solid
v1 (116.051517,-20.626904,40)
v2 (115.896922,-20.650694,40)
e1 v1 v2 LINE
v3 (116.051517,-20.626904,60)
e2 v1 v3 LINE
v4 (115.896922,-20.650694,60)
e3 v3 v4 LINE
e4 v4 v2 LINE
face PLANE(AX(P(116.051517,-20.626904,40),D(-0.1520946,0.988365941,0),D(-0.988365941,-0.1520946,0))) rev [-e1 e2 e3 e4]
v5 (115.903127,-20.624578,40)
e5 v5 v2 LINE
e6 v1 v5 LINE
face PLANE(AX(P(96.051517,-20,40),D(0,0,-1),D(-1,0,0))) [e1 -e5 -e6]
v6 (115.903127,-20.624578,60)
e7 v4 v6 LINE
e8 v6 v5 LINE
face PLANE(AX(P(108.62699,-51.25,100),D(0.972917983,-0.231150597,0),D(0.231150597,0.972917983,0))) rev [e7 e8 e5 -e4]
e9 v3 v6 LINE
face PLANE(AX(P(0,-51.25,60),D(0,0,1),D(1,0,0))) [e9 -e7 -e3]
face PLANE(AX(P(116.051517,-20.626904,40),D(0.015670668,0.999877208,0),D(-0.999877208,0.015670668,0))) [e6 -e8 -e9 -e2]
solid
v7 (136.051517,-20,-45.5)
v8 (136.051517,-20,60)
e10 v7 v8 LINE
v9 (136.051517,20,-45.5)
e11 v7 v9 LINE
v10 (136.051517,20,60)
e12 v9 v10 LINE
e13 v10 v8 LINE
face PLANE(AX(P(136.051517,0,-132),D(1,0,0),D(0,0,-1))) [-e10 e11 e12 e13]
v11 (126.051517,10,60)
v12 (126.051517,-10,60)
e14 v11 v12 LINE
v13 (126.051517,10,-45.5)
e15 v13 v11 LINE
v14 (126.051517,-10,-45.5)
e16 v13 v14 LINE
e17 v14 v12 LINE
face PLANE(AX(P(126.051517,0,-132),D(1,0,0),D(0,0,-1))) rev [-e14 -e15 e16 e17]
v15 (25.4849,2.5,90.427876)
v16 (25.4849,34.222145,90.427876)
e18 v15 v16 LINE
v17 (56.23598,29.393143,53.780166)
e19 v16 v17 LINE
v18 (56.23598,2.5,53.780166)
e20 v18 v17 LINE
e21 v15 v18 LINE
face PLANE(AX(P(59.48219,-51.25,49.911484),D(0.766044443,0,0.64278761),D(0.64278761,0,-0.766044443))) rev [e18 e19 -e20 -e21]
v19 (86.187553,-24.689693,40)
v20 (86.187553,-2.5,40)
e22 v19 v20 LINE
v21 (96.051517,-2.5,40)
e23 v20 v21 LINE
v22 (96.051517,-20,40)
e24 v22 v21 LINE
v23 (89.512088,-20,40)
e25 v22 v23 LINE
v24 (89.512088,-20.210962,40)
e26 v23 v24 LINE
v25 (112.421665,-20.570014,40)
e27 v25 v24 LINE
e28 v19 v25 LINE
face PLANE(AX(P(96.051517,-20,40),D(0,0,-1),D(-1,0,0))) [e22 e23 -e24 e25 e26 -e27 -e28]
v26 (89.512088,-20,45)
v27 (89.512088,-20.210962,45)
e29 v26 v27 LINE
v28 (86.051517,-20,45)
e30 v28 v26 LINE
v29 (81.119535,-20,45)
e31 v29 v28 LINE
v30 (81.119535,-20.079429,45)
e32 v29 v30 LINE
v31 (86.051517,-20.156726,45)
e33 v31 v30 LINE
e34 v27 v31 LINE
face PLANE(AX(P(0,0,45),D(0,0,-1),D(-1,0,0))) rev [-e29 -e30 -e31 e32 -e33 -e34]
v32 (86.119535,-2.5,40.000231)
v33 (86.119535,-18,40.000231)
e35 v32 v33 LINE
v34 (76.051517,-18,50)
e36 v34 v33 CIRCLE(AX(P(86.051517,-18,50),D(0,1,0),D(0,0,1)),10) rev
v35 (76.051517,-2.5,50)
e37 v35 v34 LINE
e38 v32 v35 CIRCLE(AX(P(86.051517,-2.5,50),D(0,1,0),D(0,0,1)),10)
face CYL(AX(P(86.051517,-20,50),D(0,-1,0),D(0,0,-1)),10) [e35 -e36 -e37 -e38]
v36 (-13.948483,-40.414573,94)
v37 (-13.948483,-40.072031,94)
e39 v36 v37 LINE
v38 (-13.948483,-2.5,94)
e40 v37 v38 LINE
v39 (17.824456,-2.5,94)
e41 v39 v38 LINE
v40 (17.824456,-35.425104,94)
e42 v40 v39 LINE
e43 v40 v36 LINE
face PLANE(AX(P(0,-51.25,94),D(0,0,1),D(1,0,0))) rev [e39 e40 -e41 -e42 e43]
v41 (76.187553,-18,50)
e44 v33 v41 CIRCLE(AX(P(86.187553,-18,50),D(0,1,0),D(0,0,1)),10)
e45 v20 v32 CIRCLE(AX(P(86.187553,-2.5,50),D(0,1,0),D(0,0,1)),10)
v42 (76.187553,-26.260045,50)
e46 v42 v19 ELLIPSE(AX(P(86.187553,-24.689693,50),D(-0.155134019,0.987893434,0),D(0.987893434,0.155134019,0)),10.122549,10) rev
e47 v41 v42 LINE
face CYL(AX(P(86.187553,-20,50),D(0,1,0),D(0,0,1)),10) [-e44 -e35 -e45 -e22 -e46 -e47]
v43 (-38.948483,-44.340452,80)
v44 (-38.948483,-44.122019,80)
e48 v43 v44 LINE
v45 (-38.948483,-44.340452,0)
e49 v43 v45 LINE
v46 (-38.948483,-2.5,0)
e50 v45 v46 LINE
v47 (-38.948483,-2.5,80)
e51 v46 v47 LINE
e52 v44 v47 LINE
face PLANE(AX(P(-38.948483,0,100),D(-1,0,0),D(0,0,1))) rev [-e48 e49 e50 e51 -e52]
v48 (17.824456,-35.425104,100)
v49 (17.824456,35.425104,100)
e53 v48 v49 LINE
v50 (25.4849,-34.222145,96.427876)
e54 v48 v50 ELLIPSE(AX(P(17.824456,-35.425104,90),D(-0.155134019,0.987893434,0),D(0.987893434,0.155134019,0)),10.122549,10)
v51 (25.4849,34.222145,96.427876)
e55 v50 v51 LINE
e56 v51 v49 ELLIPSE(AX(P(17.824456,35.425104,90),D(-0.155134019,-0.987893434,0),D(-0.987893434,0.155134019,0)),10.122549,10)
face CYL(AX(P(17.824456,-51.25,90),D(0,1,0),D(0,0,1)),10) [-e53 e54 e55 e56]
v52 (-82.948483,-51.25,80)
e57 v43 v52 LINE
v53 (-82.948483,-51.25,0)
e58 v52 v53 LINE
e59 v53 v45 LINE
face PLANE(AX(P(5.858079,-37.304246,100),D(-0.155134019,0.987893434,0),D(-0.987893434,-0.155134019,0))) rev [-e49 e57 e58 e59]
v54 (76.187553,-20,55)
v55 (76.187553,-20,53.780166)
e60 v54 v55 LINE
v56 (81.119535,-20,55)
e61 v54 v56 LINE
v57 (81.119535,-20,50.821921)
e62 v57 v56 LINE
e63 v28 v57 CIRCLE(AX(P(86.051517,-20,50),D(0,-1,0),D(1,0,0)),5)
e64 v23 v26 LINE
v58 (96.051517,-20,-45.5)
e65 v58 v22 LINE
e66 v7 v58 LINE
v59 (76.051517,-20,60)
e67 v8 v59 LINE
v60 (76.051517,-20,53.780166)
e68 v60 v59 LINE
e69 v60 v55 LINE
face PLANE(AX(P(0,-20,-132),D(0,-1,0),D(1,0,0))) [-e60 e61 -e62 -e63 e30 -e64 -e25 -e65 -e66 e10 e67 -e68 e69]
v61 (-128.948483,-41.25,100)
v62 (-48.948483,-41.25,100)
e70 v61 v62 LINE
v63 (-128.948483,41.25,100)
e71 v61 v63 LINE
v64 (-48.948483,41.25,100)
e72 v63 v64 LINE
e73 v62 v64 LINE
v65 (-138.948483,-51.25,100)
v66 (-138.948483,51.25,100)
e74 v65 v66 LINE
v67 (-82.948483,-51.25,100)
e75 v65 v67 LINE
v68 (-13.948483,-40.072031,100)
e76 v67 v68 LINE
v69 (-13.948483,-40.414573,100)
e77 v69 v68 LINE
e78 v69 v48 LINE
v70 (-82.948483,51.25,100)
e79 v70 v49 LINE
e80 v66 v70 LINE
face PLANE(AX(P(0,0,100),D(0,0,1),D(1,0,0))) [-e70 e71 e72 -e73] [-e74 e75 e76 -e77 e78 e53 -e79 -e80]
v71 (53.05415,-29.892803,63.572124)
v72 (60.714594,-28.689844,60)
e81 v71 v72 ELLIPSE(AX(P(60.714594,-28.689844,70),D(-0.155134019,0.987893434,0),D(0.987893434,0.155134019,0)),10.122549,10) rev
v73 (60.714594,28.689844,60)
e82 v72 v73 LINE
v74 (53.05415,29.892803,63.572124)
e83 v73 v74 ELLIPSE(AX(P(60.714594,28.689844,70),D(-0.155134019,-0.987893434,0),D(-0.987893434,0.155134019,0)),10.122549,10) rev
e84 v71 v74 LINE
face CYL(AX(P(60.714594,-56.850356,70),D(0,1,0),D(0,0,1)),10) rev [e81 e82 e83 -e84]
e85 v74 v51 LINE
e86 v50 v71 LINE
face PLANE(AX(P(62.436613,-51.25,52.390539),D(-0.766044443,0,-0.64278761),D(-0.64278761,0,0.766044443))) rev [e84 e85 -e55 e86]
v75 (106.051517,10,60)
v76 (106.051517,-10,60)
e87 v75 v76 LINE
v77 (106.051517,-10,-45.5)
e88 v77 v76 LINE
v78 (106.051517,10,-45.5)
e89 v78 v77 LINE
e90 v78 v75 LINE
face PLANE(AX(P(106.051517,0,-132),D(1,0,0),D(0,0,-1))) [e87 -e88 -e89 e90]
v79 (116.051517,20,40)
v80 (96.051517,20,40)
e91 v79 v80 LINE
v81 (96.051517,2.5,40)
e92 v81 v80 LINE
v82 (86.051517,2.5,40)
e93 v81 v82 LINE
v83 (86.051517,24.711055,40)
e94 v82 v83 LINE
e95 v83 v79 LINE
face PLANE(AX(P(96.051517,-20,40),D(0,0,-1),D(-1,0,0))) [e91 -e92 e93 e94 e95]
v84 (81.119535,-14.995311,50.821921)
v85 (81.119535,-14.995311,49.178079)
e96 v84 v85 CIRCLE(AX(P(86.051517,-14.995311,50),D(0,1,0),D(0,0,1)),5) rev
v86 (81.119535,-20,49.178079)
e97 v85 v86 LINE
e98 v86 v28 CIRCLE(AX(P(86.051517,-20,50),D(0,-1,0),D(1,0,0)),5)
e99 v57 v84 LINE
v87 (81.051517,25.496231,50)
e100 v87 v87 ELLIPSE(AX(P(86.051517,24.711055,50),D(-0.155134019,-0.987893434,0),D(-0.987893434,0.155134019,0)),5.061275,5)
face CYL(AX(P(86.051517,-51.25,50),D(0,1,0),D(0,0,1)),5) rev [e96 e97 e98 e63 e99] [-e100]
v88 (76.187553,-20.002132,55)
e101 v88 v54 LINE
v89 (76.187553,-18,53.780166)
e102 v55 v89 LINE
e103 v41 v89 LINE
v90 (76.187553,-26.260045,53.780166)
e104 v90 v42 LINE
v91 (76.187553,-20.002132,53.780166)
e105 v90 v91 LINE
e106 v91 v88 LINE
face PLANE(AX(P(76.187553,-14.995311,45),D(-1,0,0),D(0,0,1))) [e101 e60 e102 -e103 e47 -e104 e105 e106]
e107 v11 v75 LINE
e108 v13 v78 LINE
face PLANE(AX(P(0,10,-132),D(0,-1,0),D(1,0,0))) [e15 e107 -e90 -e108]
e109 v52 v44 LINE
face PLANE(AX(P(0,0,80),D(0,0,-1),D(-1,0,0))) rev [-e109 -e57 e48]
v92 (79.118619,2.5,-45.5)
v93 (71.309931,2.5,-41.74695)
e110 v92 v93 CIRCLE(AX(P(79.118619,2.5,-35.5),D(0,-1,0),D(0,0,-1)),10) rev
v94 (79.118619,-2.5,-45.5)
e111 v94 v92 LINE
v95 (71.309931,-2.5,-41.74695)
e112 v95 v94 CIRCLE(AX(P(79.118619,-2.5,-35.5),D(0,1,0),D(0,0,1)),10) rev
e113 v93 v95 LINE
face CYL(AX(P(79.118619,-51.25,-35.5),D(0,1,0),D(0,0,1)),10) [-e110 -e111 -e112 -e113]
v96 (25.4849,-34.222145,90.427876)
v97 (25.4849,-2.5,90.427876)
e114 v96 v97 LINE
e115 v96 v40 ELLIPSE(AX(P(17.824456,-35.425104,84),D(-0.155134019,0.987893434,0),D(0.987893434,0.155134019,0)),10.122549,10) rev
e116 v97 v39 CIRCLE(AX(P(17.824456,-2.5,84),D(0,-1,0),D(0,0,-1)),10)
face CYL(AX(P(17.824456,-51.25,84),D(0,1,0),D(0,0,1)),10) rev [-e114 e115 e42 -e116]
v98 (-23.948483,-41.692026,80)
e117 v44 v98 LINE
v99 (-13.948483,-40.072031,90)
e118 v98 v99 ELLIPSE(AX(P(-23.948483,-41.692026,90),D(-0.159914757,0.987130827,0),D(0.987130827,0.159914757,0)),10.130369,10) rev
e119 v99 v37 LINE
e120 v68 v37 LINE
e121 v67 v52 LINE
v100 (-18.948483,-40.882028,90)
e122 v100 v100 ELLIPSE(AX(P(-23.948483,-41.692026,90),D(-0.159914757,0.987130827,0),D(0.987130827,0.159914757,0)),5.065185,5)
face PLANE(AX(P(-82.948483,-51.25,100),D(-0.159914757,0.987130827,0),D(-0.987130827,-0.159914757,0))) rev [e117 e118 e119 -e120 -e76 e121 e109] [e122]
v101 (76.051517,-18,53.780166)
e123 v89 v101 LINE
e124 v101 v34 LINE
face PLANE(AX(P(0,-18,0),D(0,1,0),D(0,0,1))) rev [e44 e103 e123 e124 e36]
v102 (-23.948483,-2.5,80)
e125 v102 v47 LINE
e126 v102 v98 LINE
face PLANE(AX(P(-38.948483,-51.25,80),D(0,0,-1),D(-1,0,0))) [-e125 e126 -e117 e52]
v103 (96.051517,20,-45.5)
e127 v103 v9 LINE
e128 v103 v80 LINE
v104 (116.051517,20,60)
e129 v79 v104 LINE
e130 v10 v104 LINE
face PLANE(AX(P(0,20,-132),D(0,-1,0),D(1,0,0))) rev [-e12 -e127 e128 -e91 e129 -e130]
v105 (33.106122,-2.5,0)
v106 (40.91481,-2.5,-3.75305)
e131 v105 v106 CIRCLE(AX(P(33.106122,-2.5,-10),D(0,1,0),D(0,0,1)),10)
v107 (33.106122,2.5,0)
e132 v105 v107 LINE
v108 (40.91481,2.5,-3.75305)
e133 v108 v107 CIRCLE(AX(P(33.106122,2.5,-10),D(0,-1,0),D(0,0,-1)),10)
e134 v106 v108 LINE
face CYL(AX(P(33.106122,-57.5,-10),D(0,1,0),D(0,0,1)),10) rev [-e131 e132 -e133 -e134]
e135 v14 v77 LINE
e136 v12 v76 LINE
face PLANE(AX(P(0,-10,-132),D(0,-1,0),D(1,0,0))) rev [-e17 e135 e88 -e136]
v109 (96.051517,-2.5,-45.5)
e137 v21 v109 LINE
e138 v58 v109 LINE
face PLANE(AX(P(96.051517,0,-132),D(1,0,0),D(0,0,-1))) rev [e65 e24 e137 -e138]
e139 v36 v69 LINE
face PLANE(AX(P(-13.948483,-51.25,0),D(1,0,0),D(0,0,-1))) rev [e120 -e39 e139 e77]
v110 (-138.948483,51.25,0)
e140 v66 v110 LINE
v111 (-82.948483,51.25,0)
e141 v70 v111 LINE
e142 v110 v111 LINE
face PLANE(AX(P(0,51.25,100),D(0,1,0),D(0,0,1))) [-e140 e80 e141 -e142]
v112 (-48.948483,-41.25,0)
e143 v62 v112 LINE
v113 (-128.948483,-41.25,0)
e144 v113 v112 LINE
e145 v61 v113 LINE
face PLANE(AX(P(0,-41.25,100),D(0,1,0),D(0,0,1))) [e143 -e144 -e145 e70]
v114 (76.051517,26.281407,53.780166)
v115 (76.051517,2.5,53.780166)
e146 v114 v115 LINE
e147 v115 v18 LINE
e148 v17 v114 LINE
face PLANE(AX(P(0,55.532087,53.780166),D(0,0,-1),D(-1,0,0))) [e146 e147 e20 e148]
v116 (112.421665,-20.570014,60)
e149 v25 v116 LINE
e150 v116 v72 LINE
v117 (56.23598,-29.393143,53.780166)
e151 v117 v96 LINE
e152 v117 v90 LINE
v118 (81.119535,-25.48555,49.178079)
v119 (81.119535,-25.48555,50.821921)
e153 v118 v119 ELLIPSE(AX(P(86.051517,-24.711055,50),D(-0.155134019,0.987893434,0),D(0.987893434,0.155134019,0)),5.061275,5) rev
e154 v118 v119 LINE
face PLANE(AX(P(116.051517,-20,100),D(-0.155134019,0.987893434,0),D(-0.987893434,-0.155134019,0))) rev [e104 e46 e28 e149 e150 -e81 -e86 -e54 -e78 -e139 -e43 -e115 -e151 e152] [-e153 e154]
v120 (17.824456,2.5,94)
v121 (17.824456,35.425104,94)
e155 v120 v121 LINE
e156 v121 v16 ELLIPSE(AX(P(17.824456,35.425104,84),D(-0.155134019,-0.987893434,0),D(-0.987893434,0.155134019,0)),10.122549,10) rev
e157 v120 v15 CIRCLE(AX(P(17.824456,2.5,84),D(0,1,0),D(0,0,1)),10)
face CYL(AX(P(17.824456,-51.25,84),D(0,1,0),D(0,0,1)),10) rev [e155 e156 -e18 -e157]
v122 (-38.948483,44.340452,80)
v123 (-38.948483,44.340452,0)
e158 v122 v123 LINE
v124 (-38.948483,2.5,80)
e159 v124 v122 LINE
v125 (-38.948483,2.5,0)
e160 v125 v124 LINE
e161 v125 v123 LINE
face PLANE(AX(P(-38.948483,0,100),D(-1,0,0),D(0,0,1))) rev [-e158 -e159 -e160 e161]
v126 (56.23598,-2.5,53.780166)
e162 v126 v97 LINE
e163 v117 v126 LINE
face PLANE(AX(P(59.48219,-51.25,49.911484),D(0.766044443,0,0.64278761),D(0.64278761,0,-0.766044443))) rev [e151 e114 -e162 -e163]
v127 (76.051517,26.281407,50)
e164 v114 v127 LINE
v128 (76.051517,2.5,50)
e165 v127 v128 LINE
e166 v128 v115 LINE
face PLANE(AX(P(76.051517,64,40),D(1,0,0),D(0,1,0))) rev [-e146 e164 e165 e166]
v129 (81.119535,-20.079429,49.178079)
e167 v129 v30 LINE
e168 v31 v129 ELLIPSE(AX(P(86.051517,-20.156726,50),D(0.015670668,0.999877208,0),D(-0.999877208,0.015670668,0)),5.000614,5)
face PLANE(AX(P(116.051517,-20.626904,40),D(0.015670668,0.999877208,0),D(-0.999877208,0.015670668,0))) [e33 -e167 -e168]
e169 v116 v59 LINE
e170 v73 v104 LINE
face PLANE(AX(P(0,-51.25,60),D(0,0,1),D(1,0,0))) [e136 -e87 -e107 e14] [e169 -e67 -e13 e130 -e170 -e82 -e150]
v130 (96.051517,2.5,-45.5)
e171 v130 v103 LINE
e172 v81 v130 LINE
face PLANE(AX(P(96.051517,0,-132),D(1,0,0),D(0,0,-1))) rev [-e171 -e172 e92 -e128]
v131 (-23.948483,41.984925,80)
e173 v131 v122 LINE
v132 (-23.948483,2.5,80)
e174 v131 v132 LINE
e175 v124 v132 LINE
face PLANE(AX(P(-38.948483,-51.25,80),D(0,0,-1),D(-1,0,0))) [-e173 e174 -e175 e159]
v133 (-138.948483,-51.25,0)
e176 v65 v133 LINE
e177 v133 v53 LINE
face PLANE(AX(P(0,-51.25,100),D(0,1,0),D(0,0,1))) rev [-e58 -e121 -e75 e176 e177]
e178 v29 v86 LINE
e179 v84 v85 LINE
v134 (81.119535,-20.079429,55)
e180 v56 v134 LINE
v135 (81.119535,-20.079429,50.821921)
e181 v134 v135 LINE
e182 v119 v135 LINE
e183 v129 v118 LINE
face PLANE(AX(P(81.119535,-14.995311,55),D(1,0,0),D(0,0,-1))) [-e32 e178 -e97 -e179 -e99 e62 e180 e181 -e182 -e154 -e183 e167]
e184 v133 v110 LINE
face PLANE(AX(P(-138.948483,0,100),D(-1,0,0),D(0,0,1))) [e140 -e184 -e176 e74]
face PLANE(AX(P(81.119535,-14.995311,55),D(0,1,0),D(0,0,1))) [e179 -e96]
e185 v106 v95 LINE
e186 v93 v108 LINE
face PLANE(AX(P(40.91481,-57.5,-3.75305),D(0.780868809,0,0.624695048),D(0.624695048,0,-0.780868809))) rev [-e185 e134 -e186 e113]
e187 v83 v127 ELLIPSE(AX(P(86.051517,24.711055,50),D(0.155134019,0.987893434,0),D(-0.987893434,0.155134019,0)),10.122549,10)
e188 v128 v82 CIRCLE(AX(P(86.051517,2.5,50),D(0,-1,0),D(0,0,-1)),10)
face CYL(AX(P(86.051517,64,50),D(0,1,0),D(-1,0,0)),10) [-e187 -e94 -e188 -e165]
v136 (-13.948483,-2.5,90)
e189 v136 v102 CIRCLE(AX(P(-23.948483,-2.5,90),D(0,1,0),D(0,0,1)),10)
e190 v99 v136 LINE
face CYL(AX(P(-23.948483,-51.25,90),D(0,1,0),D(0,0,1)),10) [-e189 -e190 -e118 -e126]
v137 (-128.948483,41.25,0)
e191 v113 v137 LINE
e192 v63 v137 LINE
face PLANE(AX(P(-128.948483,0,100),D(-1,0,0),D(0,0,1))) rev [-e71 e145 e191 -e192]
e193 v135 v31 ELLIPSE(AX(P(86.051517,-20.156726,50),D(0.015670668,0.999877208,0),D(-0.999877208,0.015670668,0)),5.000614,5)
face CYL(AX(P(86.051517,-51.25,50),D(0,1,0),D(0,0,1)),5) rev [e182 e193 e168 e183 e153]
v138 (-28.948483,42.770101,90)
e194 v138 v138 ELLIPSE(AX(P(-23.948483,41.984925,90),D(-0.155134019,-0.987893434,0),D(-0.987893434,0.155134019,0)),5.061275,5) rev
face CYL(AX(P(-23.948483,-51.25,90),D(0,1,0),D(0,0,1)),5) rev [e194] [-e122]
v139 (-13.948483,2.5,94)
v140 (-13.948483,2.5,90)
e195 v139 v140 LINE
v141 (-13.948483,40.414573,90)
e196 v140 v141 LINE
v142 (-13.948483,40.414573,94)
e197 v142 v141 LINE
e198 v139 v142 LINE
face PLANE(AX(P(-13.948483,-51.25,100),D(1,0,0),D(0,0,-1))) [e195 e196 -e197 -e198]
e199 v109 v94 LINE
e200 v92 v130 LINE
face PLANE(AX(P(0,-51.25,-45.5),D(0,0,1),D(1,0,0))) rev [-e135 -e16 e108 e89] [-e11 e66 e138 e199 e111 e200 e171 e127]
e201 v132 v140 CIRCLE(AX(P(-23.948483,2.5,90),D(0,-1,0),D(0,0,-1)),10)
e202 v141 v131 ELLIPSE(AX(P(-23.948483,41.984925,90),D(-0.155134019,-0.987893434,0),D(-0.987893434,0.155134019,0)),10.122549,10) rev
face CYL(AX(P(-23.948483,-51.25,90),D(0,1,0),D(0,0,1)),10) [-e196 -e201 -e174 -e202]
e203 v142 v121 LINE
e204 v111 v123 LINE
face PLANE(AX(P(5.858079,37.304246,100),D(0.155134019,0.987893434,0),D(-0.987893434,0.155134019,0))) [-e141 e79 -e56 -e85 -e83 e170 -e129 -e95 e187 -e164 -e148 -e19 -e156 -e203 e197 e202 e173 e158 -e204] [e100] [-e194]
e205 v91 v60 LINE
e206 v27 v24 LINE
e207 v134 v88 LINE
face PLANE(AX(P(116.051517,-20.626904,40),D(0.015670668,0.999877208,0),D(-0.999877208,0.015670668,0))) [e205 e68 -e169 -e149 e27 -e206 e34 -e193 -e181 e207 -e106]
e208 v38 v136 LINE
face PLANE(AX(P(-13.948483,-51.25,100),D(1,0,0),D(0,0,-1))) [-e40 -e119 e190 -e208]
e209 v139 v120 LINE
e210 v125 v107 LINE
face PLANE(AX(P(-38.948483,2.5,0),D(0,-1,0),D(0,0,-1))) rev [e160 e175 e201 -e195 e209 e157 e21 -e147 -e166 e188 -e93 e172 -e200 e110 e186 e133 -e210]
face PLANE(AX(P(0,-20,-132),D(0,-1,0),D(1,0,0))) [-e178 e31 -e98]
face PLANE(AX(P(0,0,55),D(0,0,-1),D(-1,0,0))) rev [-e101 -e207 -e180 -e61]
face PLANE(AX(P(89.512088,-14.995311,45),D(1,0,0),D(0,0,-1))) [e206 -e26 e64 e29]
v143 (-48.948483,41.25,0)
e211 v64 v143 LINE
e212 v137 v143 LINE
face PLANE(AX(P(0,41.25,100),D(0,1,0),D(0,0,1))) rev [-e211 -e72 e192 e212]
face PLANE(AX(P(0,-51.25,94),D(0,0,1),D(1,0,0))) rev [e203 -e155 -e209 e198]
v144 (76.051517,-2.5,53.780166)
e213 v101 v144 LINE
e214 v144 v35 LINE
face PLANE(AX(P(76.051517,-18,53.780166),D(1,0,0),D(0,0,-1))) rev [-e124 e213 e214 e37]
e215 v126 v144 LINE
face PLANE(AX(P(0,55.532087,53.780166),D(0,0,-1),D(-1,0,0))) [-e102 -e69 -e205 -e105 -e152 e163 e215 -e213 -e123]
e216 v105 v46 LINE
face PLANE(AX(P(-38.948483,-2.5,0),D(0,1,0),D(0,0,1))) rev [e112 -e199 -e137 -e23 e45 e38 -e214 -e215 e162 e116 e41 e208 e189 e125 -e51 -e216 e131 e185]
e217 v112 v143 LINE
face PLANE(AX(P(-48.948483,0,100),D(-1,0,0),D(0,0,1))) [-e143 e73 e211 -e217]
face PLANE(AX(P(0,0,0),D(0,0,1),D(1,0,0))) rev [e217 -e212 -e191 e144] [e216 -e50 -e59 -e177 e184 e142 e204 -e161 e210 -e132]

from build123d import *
from build123d.topology import SkipClean

# Parameters (mm, degrees)
ESQUISSE1_W                   = 80
ESQUISSE1_H                   = 82.5
BOSS_EXTRU_3_DEPTH            = 100
ESQUISSE2_W                   = 25
ESQUISSE2_H                   = 20
BOSS_EXTRU_4_DEPTH            = 102.5
ENL_V_MAT_EXTRU_1_DEPTH       = 169.324814886
ESQUISSE5_W                   = 25
ESQUISSE5_H                   = 5
BOSS_EXTRU_6_DEPTH            = 80
ESQUISSE6_R                   = 5
ENL_V_MAT_EXTRU_2_DEPTH       = 200.531778938
CONG_1_R                      = 10
BOSS_EXTRU_7_DEPTH            = 132
BOSS_EXTRU_7_DEPTH_BACK       = 156
ESQUISSE7_W                   = 40
ESQUISSE7_H                   = 40
ESQUISSE7_W_2                 = 20
ESQUISSE7_H_2                 = 20
ESQUISSE8_W                   = 56.966100386
ESQUISSE8_H                   = 72.151969112
ESQUISSE8_H_2                 = 40
ENL_V_MAT_EXTRU_3_DEPTH       = 233.699228203
ESQUISSE9_W                   = 40
ESQUISSE9_H                   = 86.5
ENL_V_MAT_EXTRU_4_DEPTH       = 205.46819632
ESQUISSE10_W                  = 20
ESQUISSE10_H                  = 20
BOSS_EXTRU_9_DEPTH            = 40
BOSS_EXTRU_10_REACH           = 209.614
ESQUISSE11_W                  = 20
ESQUISSE11_H                  = 5
BOSS_EXTRU_11_DEPTH           = 20
ESQUISSE14_R                  = 5
ENL_V_MAT_EXTRU_5_DEPTH       = 200.531778938
CONG_2_R                      = 10
CONG_3_R                      = 10
BOSS_EXTRU_30_DEPTH           = 102.5
ESQUISSE27_W                  = 37.951925993
ESQUISSE27_H                  = 112.382443636
BOSS_EXTRU_49_DEPTH           = 60
ENL_V_MAT_EXTRU_8_DEPTH       = 205.784019015
ESQUISSE29_W                  = 18.162926374
ESQUISSE29_H                  = 48.488335355
ENL_V_MAT_EXTRU_9_DEPTH       = 205.784019015
ENL_V_MAT_EXTRU_15_DEPTH      = 188.114342077
ENL_V_MAT_EXTRU_15_DEPTH_BACK = 104
ENL_V_MAT_EXTRU_25_DEPTH      = 202.764949791
ENL_V_MAT_EXTRU_33_DEPTH      = 157
ENL_V_MAT_EXTRU_34_DEPTH      = 157
BOSS_EXTRU_60_REACH           = 180.699
ESQUISSE48_W                  = 90
ESQUISSE48_H                  = 5
ESQUISSE49_W                  = 4.284374684
ESQUISSE49_H                  = 33.615862906
BOSS_EXTRU_61_DEPTH           = 5
BOSS_EXTRU_63_DEPTH           = 44
BOSS_EXTRU_63_DEPTH_BACK      = 17.5
ENL_V_MAT_EXTRU_35_DEPTH      = 212.123022919
CONG_5_START                  = 2.5
CONG_5_DEPTH                  = 48.75
BOSS_EXTRU_70_DEPTH           = 15.5
CONG_6_R                      = 10
ESQUISSE70_W                  = 13.324534179
ESQUISSE70_H                  = 11.766054646
BOSS_EXTRU_72_DEPTH           = 5
ESQUISSE71_W                  = 4.931981982
ESQUISSE71_H                  = 11.766054646
BOSS_EXTRU_73_DEPTH           = 15
CONG_7_R                      = 10
ENL_V_MAT_EXTRU_36_DEPTH      = 208.613808082
BOSS_EXTRU_74_REACH           = 209.614
ESQUISSE75_W                  = 50.566617397
ESQUISSE75_H                  = 5
ENL_V_MAT_EXTRU_37_DEPTH      = 180.431723244
ENL_V_MAT_EXTRU_37_DEPTH_BACK = 60
CONG_8_R                      = 10


with BuildPart() as part:
    # Esquisse1 → Boss.-Extru.3 (new body)
    with BuildSketch(Plane.XY):
        Polygon((-138.948482562, -51.25), (-82.948482562, -51.25), (-38.948482562, -44.340452261), (-38.948482562, 44.340452261), (-82.948482562, 51.25), (-138.948482562, 51.25), align=None)
        with Locations((-88.948482562, 0)):
            Rectangle(ESQUISSE1_W, ESQUISSE1_H, mode=Mode.SUBTRACT)
    extrude(amount=BOSS_EXTRU_3_DEPTH)

    # Esquisse2 → Boss.-Extru.4 (add, through all)
    with BuildSketch(Plane(origin=(0, 51.25, 0), x_dir=(1, 0, 0), z_dir=(0, 1, 0))):
        with Locations((-26.448482562, -90)):
            Rectangle(ESQUISSE2_W, ESQUISSE2_H)
    extrude(amount=-BOSS_EXTRU_4_DEPTH)

    # Esquisse4 → Enlèv. mat.-Extru.1 (cut, through all)
    with BuildSketch(Plane(origin=(0, 0, 80), x_dir=(-1, 0, 0), z_dir=(0, 0, -1))):
        Polygon((82.948482562, 51.25), (7.101445633, 39.733012599), (13.461078658, 66.038767386), (82.948482562, 62.280802417), align=None)
        Polygon((82.948482562, -51.25), (-9.375785388, -36.29350948), (26.758493166, -73.584084948), align=None)
    extrude(amount=-ENL_V_MAT_EXTRU_1_DEPTH, mode=Mode.SUBTRACT)

    # Esquisse5 → Boss.-Extru.6 (add)
    with BuildSketch(Plane(origin=(0, 0, 80), x_dir=(-1, 0, 0), z_dir=(0, 0, -1))):
        with Locations((26.448482562, 0)):
            Rectangle(ESQUISSE5_W, ESQUISSE5_H)
    extrude(amount=BOSS_EXTRU_6_DEPTH)

    # Esquisse6 → Enlèv. mat.-Extru.2 (cut, through all)
    with BuildSketch(Plane(origin=(0, 51.25, 0), x_dir=(1, 0, 0), z_dir=(0, 1, 0))):
        with Locations(Location((-23.948482562, -90, 0), (0, 0, 180))):
            Circle(ESQUISSE6_R)
    extrude(amount=-ENL_V_MAT_EXTRU_2_DEPTH, mode=Mode.SUBTRACT)

    # Congé1
    cong_1_edges = [part.edges().sort_by_distance(p)[0] for p in [
        (-13.948482562, -21.286015279, 80),
        (-13.948482562, 21.636350193, 80),
    ]]
    fillet(cong_1_edges, radius=CONG_1_R)

    # Esquisse21 → Boss.-Extru.30 (add, through all)
    with BuildSketch(Plane(origin=(0, 51.25, 0), x_dir=(1, 0, 0), z_dir=(0, 1, 0))):
        with BuildLine():
            Line((40.768208739, -72.213938048), (25.484900041, -90.427876097))
            ThreePointArc((25.484900041, -90.427876097), (22.050638227, -93.06307787), (17.824455609, -94))
            Line((17.824455609, -94), (13.584684534, -94))
            Line((13.584684534, -94), (-13.948482562, -94))
            Line((-13.948482562, -94), (-13.948482562, -97))
            Line((-13.948482562, -97), (-13.948482562, -100))
            Line((-13.948482562, -100), (17.824455609, -100))
            ThreePointArc((17.824455609, -100), (22.050638227, -99.06307787), (25.484900041, -96.427876097))
            Line((25.484900041, -96.427876097), (43.69734513, -74.723129231))
            Line((43.69734513, -74.723129231), (40.768208739, -72.213938048))
        make_face()
    extrude(amount=-BOSS_EXTRU_30_DEPTH)



with BuildPart() as body_2:
    # Esquisse7 → Boss.-Extru.7 (new, two sides: drawn at the far end of the back side and taken through both)
    with BuildSketch(Plane(origin=(0, 0, 0), x_dir=(-1, 0, 0), z_dir=(0, 0, -1)).offset(-BOSS_EXTRU_7_DEPTH_BACK)):
        with Locations((-116.051517438, 0)):
            Rectangle(ESQUISSE7_W, ESQUISSE7_H)
        with Locations((-116.051517438, 0)):
            Rectangle(ESQUISSE7_W_2, ESQUISSE7_H_2, mode=Mode.SUBTRACT)
    extrude(amount=BOSS_EXTRU_7_DEPTH + BOSS_EXTRU_7_DEPTH_BACK)

    # Esquisse8 → Enlèv. mat.-Extru.3 (cut, through all)
    with BuildSketch(Plane(origin=(0, 51.25, 0), x_dir=(1, 0, 0), z_dir=(0, 1, 0))):
        with Locations((124.534567631, -136.075984556)):
            Rectangle(ESQUISSE8_W, ESQUISSE8_H)
        with Locations((124.534567631, -80)):
            Rectangle(ESQUISSE8_W, ESQUISSE8_H_2)
    extrude(amount=-ENL_V_MAT_EXTRU_3_DEPTH, mode=Mode.SUBTRACT)

    # Esquisse9 → Enlèv. mat.-Extru.4 (cut, through all)
    with BuildSketch(Plane(origin=(0, 20, 0), x_dir=(1, 0, 0), z_dir=(0, 1, 0))):
        with Locations((116.051517438, 88.75)):
            Rectangle(ESQUISSE9_W, ESQUISSE9_H)
    extrude(amount=-ENL_V_MAT_EXTRU_4_DEPTH, mode=Mode.SUBTRACT)

    # Esquisse10 → Boss.-Extru.9 (add)
    with BuildSketch(Plane(origin=(0, 20, 0), x_dir=(1, 0, 0), z_dir=(0, 1, 0))):
        with Locations((86.051517438, -50)):
            Rectangle(ESQUISSE10_W, ESQUISSE10_H)
    extrude(amount=-BOSS_EXTRU_9_DEPTH)

    # Esquisse11 → Boss.-Extru.10 (add, up to next)
    with BuildSketch(Plane(origin=(0, 0, -45.5), x_dir=(-1, 0, 0), z_dir=(0, 0, -1)), mode=Mode.PRIVATE) as boss_extru_10_sk1:
        with Locations((-86.051517438, 0)):
            Rectangle(ESQUISSE11_W, ESQUISSE11_H)
    boss_extru_10_tool1 = extrude(boss_extru_10_sk1.sketch, amount=-BOSS_EXTRU_10_REACH, mode=Mode.PRIVATE) - body_2.part
    add(boss_extru_10_tool1.solids().sort_by_distance((86.051517, 0, -45.5))[0])

    # Esquisse13 → Boss.-Extru.11 (add)
    with BuildSketch(Plane.XY.offset(60)):
        Polygon((116.051517438, 20), (76.051517438, 26.281407035), (76.051517438, 20), align=None)
        Polygon((116.051517438, -20.626903689), (76.051517438, -20), (75.510830831, -26.86550344), align=None)
    extrude(amount=-BOSS_EXTRU_11_DEPTH)


with BuildPart() as boss_extru_11_piece_1:
    # of the separate pieces the step leaves, piece 1, a body of its own (boss_extru_11_pieces)
    add(body_2.part.solids().sort_by_distance((136.051517438, -20, 60))[0])


with BuildPart() as boss_extru_11_piece_2:
    # of the separate pieces the step leaves, piece 2, a body of its own (boss_extru_11_pieces)
    add(body_2.part.solids().sort_by_distance((116.051517438, -20.626903689, 60))[0])


with BuildPart() as enl_v_mat_extru_5_tool:
    # Esquisse14 → Enlèv. mat.-Extru.5 (new, through all)
    with BuildSketch(Plane(origin=(0, 51.25, 0), x_dir=(1, 0, 0), z_dir=(0, 1, 0))):
        with Locations((86.051517438, -50)):
            Circle(ESQUISSE14_R)
    extrude(amount=-ENL_V_MAT_EXTRU_5_DEPTH)


with BuildPart() as boss_extru_11_piece_1_1:
    add(boss_extru_11_piece_1.part)

    # Enlèv. mat.-Extru.5: cut by enl_v_mat_extru_5_tool
    add(enl_v_mat_extru_5_tool.part, mode=Mode.SUBTRACT)

    # Congé2
    cong_2_edges = [boss_extru_11_piece_1_1.edges().sort_by_distance(p)[0] for p in [
        (76.051517438, -11.25, 40),
        (76.051517438, 14.390703518, 40),
    ]]
    fillet(cong_2_edges, radius=CONG_2_R)


with BuildPart() as boss_extru_11_piece_2_1:
    add(boss_extru_11_piece_2.part)

    # Enlèv. mat.-Extru.5: cut by enl_v_mat_extru_5_tool
    add(enl_v_mat_extru_5_tool.part, mode=Mode.SUBTRACT)

    # Congé3
    cong_3_edges = [boss_extru_11_piece_2_1.edges().sort_by_distance(p)[0] for p in [
        (75.781174135, -23.43275172, 40),
    ]]
    fillet(cong_3_edges, radius=CONG_3_R)


with BuildPart() as part_1:
    add(part.part)

    add(boss_extru_11_piece_1_1.part)  # Boss.-Extru.49 merges Boss.-Extru.11 piece 1

    add(boss_extru_11_piece_2_1.part)  # Boss.-Extru.49 merges Boss.-Extru.11 piece 2
    # Esquisse27 → Boss.-Extru.49 (add, through all)
    with BuildSketch(Plane(origin=(0, 0, 40), x_dir=(-1, 0, 0), z_dir=(0, 0, -1))):
        with Locations((-57.075554442, -0.659134567)):
            Rectangle(ESQUISSE27_W, ESQUISSE27_H)
    extrude(amount=-BOSS_EXTRU_49_DEPTH)

    # Esquisse28 → Enlèv. mat.-Extru.8 (cut, through all)
    with BuildSketch(Plane(origin=(0, 55.532087251, 0), x_dir=(1, 0, 0), z_dir=(0, 1, 0))):
        with BuildLine():
            ThreePointArc((60.71459402, -60), (56.488411402, -60.93692213), (53.054149588, -63.572123903))
            Line((53.054149588, -63.572123903), (38.099591445, -81.394272297))
            Line((38.099591445, -81.394272297), (38.099591445, -100))
            Line((38.099591445, -100), (76.006099273, -100))
            Line((76.006099273, -100), (76.051517438, -60))
            Line((76.051517438, -60), (60.71459402, -60))
        make_face()
    extrude(amount=-ENL_V_MAT_EXTRU_8_DEPTH, mode=Mode.SUBTRACT)


with BuildPart() as enl_v_mat_extru_8_piece_1:
    # of the separate pieces the step leaves, piece 1, a body of its own (enl_v_mat_extru_8_pieces)
    add(part_1.part.solids().sort_by_distance((86.070114786, -20.157017391, 40))[0])

    # Esquisse33 → Enlèv. mat.-Extru.15 (cut, two sides: drawn at the far end of the back side and taken through both)
    with BuildSketch(Plane.XZ.offset(20).offset(-ENL_V_MAT_EXTRU_15_DEPTH_BACK)):
        Polygon((27.047173314, 88.566031311), (73.834674686, 32.806858462), (27.047173314, 32.806858462), align=None)
    extrude(amount=ENL_V_MAT_EXTRU_15_DEPTH + ENL_V_MAT_EXTRU_15_DEPTH_BACK, mode=Mode.SUBTRACT)

    # Esquisse36 → Enlèv. mat.-Extru.25 (cut, through all)
    with BuildSketch(Plane.XZ.offset(51.25)):
        Polygon((79.625069152, 53.780166313), (51.611850064, 53.780166313), (51.611850064, 28.403485492), (51.611850064, 26.096514508), (51.611850064, 20.164303407), (79.625069152, 20.164303407), align=None)
    extrude(amount=-ENL_V_MAT_EXTRU_25_DEPTH, mode=Mode.SUBTRACT)

    # Esquisse46 → Enlèv. mat.-Extru.33 (cut)
    with BuildSketch(Plane(origin=(0, 0, -45.5), x_dir=(-1, 0, 0), z_dir=(0, 0, -1))):
        Polygon((-116.051517438, 20), (82.948482562, 51.25), (-79.954636435, 76.953960671), align=None)
    extrude(amount=-ENL_V_MAT_EXTRU_33_DEPTH, mode=Mode.SUBTRACT)

    # Esquisse47 → Enlèv. mat.-Extru.34 (cut)
    with BuildSketch(Plane(origin=(0, 0, -45.5), x_dir=(-1, 0, 0), z_dir=(0, 0, -1))):
        Polygon((-82.644960183, -25.767668615), (82.948482562, -51.25), (-105.331317256, -68.548851228), align=None)
    extrude(amount=-ENL_V_MAT_EXTRU_34_DEPTH, mode=Mode.SUBTRACT)

    # Esquisse48 → Boss.-Extru.60 (add, up to next)
    with BuildSketch(Plane(origin=(0, 0, 0), x_dir=(-1, 0, 0), z_dir=(0, 0, -1)), mode=Mode.PRIVATE) as boss_extru_60_sk1:
        with Locations((-31.051517438, 0)):
            Rectangle(ESQUISSE48_W, ESQUISSE48_H)
    boss_extru_60_tool1 = extrude(boss_extru_60_sk1.sketch, amount=-BOSS_EXTRU_60_REACH, mode=Mode.PRIVATE) - enl_v_mat_extru_8_piece_1.part
    add(boss_extru_60_tool1.solids().sort_by_distance((31.051517, 0, 0))[0])

    # Esquisse49 → Boss.-Extru.61 (add)
    with SkipClean():  # the faces are left unmerged after this step: merging them gives an invalid solid
        with BuildSketch(Plane.XZ.offset(2.5)):
            with Locations((77.48288181, 36.97223486)):
                Rectangle(ESQUISSE49_W, ESQUISSE49_H)
        extrude(amount=-BOSS_EXTRU_61_DEPTH)

    # Esquisse51 → Boss.-Extru.63 (add, two sides: drawn at the far end of the back side and taken through both)
    with BuildSketch(Plane(origin=(0, 20, 0), x_dir=(1, 0, 0), z_dir=(0, 1, 0)).offset(-BOSS_EXTRU_63_DEPTH_BACK)):
        Polygon((76.051517438, -40), (76.051517438, -53.780166313), (79.625069152, -53.780166313), (79.625069152, -42.33835772), (86.051517438, -42.33835772), (86.051517438, -40), align=None)
    extrude(amount=BOSS_EXTRU_63_DEPTH + BOSS_EXTRU_63_DEPTH_BACK)

    # Esquisse53 → Enlèv. mat.-Extru.35 (cut, through all)
    with BuildSketch(Plane.XY.offset(100)):
        Polygon((-80.095816123, 50.802031024), (116.051517438, 20), (116.051517438, 87.283768072), (-75.409684876, 80.643314802), align=None)
    extrude(amount=-ENL_V_MAT_EXTRU_35_DEPTH, mode=Mode.SUBTRACT)

    # Congé5: read off the stored shape, not the designer's step
    # Congé5 outline → Congé5 (cut)
    with BuildSketch(Plane(origin=(0, 0, 0), x_dir=(1, 0, 0), z_dir=(0, 1, 0)).offset(CONG_5_START)):
        with BuildLine():
            ThreePointArc((76.051517438, -50), (78.980449626, -42.928932188), (86.051517438, -40))
            Line((86.051517438, -40), (76.051517438, -40))
            Line((76.051517438, -40), (76.051517438, -50))
        make_face()
    extrude(amount=CONG_5_DEPTH, mode=Mode.SUBTRACT)

    # Esquisse68 → Boss.-Extru.70 (add)
    with BuildSketch(Plane.XZ.offset(2.5)):
        Polygon((76.051517438, 53.780166313), (76.051517438, 40), (91.051517438, 40), (79.625069152, 44.222715095), (79.625069152, 53.780166313), align=None)
    extrude(amount=BOSS_EXTRU_70_DEPTH)

    # Congé6
    cong_6_edges = [enl_v_mat_extru_8_piece_1.edges().sort_by_distance(p)[0] for p in [
        (76.051517438, -10.25, 40),
    ]]
    fillet(cong_6_edges, radius=CONG_6_R - 0.0001)  # a hair under: the kernel refuses the full size

    # Esquisse70 → Boss.-Extru.72 (add)
    with BuildSketch(Plane(origin=(0, 0, 40), x_dir=(-1, 0, 0), z_dir=(0, 0, -1))):
        with Locations((-82.849820564, -20.878338717)):
            Rectangle(ESQUISSE70_W, ESQUISSE70_H)
    extrude(amount=-BOSS_EXTRU_72_DEPTH)

    # Esquisse71 → Boss.-Extru.73 (add)
    with BuildSketch(Plane(origin=(0, 0, 40), x_dir=(-1, 0, 0), z_dir=(0, 0, -1))):
        with Locations((-78.653544465, -20.878338717)):
            Rectangle(ESQUISSE71_W, ESQUISSE71_H)
    extrude(amount=-BOSS_EXTRU_73_DEPTH)

    # Congé7
    # the kernel refuses this fillet: 10 mm, written as the material it takes off along each edge
    with BuildSketch(Plane(origin=(76.187553474, 10.004688606, 40), x_dir=(1, 0, 0), z_dir=(0, -1, 0))) as cong_7_piece_1_section:
        with BuildLine():
            CenterArc((CONG_7_R, CONG_7_R), CONG_7_R, 180, 90)
            Line((0, CONG_7_R), (0, 0))
            Line((0, 0), (CONG_7_R, 0))
        make_face()
    cong_7_piece_1 = extrude(amount=61.766054646, mode=Mode.PRIVATE)
    cong_7_piece_1 = cong_7_piece_1 - Plane(origin=(86.051517438, 10.004688606, 50), x_dir=(-1.0, 0, 4.5931614069849837e-11), z_dir=(0, -1, 0)) * Cylinder(10, 164, mode=Mode.PRIVATE)
    cong_7_piece_1 = split(cong_7_piece_1, bisect_by=Plane(origin=(76.187553474, -2.5, 40), z_dir=(0, -1, 0)), keep=Keep.TOP, mode=Mode.PRIVATE)
    add(cong_7_piece_1, mode=Mode.SUBTRACT)
    with BuildSketch(Plane(origin=(76.187553474, 10.004688606, 40), x_dir=(1, 0, 0), z_dir=(0, -1, 0))) as cong_7_piece_2_section:
        with BuildLine():
            CenterArc((CONG_7_R, CONG_7_R), CONG_7_R, 180, 90)
            Line((0, CONG_7_R), (0, 0))
            Line((0, 0), (CONG_7_R, 0))
        make_face()
    cong_7_piece_2 = extrude(amount=61.766054646, mode=Mode.PRIVATE)
    cong_7_piece_2 = split(cong_7_piece_2, bisect_by=Plane(origin=(76.187553474, -18, 40), z_dir=(0, -1, 0)), keep=Keep.TOP, mode=Mode.PRIVATE)
    add(cong_7_piece_2, mode=Mode.SUBTRACT)

    # Esquisse73 → Enlèv. mat.-Extru.36 (cut, through all)
    with BuildSketch(Plane(origin=(0, 0, -45.5), x_dir=(-1, 0, 0), z_dir=(0, 0, -1))):
        Polygon((-116.051517438, -20), (82.948482562, -51.25), (-108.62699009, -51.25), align=None)
    extrude(amount=-ENL_V_MAT_EXTRU_36_DEPTH, mode=Mode.SUBTRACT)


with BuildPart() as enl_v_mat_extru_8_piece_2:
    # of the separate pieces the step leaves, piece 2, a body of its own (enl_v_mat_extru_8_pieces)
    add(part_1.part.solids().sort_by_distance((76.051517438, 55.532087251, 100))[0])

    # Esquisse29 → Enlèv. mat.-Extru.9 (cut, through all)
    with BuildSketch(Plane(origin=(0, 55.532087251, 0), x_dir=(1, 0, 0), z_dir=(0, 1, 0))):
        with Locations((77.464518916, -84.244167678)):
            Rectangle(ESQUISSE29_W, ESQUISSE29_H)
    extrude(amount=-ENL_V_MAT_EXTRU_9_DEPTH, mode=Mode.SUBTRACT)


with BuildPart() as enl_v_mat_extru_36_piece_1:
    # of the separate pieces the step leaves, piece 1, a body of its own (enl_v_mat_extru_36_pieces)
    add(enl_v_mat_extru_8_piece_1.part.solids().sort_by_distance((86.051417438, -2.5, 40))[0])

    # Esquisse75 → Boss.-Extru.74 (add, up to next)
    with BuildSketch(Plane(origin=(0, 0, -45.5), x_dir=(-1, 0, 0), z_dir=(0, 0, -1)), mode=Mode.PRIVATE) as boss_extru_74_sk1:
        with Locations((-50.76820874, 0)):
            Rectangle(ESQUISSE75_W, ESQUISSE75_H)
    boss_extru_74_tool1 = extrude(boss_extru_74_sk1.sketch, amount=-BOSS_EXTRU_74_REACH, mode=Mode.PRIVATE) - enl_v_mat_extru_36_piece_1.part
    add(boss_extru_74_tool1.solids().sort_by_distance((50.768209, 0, -45.5))[0])

    # Esquisse76 → Enlèv. mat.-Extru.37 (cut, two sides: drawn at the far end of the back side and taken through both)
    with BuildSketch(Plane(origin=(0, 2.5, 0), x_dir=(1, 0, 0), z_dir=(0, 1, 0)).offset(-ENL_V_MAT_EXTRU_37_DEPTH_BACK)):
        with BuildLine():
            Line((40.914809763, 3.753049524), (74.971252324, 46.323602726))
            Line((74.971252324, 46.323602726), (25.484900041, 45.5))
            Line((25.484900041, 45.5), (25.484900041, 0))
            Line((25.484900041, 0), (33.106121669, 0))
            ThreePointArc((33.106121669, 0), (37.438008974, 0.986967637), (40.914809763, 3.753049524))
        make_face()
    extrude(amount=ENL_V_MAT_EXTRU_37_DEPTH + ENL_V_MAT_EXTRU_37_DEPTH_BACK, mode=Mode.SUBTRACT)

    # Congé8
    cong_8_edges = [enl_v_mat_extru_36_piece_1.edges().sort_by_distance(p)[0] for p in [
        (74.312370144, 0, -45.5),
    ]]
    fillet(cong_8_edges, radius=CONG_8_R)


with BuildPart() as enl_v_mat_extru_36_piece_2:
    # of the separate pieces the step leaves, piece 2, a body of its own (enl_v_mat_extru_36_pieces)
    add(enl_v_mat_extru_8_piece_1.part.solids().sort_by_distance((116.051517438, -20.626903689, 40))[0])


solid = Compound([enl_v_mat_extru_36_piece_1.part, enl_v_mat_extru_36_piece_2.part])
